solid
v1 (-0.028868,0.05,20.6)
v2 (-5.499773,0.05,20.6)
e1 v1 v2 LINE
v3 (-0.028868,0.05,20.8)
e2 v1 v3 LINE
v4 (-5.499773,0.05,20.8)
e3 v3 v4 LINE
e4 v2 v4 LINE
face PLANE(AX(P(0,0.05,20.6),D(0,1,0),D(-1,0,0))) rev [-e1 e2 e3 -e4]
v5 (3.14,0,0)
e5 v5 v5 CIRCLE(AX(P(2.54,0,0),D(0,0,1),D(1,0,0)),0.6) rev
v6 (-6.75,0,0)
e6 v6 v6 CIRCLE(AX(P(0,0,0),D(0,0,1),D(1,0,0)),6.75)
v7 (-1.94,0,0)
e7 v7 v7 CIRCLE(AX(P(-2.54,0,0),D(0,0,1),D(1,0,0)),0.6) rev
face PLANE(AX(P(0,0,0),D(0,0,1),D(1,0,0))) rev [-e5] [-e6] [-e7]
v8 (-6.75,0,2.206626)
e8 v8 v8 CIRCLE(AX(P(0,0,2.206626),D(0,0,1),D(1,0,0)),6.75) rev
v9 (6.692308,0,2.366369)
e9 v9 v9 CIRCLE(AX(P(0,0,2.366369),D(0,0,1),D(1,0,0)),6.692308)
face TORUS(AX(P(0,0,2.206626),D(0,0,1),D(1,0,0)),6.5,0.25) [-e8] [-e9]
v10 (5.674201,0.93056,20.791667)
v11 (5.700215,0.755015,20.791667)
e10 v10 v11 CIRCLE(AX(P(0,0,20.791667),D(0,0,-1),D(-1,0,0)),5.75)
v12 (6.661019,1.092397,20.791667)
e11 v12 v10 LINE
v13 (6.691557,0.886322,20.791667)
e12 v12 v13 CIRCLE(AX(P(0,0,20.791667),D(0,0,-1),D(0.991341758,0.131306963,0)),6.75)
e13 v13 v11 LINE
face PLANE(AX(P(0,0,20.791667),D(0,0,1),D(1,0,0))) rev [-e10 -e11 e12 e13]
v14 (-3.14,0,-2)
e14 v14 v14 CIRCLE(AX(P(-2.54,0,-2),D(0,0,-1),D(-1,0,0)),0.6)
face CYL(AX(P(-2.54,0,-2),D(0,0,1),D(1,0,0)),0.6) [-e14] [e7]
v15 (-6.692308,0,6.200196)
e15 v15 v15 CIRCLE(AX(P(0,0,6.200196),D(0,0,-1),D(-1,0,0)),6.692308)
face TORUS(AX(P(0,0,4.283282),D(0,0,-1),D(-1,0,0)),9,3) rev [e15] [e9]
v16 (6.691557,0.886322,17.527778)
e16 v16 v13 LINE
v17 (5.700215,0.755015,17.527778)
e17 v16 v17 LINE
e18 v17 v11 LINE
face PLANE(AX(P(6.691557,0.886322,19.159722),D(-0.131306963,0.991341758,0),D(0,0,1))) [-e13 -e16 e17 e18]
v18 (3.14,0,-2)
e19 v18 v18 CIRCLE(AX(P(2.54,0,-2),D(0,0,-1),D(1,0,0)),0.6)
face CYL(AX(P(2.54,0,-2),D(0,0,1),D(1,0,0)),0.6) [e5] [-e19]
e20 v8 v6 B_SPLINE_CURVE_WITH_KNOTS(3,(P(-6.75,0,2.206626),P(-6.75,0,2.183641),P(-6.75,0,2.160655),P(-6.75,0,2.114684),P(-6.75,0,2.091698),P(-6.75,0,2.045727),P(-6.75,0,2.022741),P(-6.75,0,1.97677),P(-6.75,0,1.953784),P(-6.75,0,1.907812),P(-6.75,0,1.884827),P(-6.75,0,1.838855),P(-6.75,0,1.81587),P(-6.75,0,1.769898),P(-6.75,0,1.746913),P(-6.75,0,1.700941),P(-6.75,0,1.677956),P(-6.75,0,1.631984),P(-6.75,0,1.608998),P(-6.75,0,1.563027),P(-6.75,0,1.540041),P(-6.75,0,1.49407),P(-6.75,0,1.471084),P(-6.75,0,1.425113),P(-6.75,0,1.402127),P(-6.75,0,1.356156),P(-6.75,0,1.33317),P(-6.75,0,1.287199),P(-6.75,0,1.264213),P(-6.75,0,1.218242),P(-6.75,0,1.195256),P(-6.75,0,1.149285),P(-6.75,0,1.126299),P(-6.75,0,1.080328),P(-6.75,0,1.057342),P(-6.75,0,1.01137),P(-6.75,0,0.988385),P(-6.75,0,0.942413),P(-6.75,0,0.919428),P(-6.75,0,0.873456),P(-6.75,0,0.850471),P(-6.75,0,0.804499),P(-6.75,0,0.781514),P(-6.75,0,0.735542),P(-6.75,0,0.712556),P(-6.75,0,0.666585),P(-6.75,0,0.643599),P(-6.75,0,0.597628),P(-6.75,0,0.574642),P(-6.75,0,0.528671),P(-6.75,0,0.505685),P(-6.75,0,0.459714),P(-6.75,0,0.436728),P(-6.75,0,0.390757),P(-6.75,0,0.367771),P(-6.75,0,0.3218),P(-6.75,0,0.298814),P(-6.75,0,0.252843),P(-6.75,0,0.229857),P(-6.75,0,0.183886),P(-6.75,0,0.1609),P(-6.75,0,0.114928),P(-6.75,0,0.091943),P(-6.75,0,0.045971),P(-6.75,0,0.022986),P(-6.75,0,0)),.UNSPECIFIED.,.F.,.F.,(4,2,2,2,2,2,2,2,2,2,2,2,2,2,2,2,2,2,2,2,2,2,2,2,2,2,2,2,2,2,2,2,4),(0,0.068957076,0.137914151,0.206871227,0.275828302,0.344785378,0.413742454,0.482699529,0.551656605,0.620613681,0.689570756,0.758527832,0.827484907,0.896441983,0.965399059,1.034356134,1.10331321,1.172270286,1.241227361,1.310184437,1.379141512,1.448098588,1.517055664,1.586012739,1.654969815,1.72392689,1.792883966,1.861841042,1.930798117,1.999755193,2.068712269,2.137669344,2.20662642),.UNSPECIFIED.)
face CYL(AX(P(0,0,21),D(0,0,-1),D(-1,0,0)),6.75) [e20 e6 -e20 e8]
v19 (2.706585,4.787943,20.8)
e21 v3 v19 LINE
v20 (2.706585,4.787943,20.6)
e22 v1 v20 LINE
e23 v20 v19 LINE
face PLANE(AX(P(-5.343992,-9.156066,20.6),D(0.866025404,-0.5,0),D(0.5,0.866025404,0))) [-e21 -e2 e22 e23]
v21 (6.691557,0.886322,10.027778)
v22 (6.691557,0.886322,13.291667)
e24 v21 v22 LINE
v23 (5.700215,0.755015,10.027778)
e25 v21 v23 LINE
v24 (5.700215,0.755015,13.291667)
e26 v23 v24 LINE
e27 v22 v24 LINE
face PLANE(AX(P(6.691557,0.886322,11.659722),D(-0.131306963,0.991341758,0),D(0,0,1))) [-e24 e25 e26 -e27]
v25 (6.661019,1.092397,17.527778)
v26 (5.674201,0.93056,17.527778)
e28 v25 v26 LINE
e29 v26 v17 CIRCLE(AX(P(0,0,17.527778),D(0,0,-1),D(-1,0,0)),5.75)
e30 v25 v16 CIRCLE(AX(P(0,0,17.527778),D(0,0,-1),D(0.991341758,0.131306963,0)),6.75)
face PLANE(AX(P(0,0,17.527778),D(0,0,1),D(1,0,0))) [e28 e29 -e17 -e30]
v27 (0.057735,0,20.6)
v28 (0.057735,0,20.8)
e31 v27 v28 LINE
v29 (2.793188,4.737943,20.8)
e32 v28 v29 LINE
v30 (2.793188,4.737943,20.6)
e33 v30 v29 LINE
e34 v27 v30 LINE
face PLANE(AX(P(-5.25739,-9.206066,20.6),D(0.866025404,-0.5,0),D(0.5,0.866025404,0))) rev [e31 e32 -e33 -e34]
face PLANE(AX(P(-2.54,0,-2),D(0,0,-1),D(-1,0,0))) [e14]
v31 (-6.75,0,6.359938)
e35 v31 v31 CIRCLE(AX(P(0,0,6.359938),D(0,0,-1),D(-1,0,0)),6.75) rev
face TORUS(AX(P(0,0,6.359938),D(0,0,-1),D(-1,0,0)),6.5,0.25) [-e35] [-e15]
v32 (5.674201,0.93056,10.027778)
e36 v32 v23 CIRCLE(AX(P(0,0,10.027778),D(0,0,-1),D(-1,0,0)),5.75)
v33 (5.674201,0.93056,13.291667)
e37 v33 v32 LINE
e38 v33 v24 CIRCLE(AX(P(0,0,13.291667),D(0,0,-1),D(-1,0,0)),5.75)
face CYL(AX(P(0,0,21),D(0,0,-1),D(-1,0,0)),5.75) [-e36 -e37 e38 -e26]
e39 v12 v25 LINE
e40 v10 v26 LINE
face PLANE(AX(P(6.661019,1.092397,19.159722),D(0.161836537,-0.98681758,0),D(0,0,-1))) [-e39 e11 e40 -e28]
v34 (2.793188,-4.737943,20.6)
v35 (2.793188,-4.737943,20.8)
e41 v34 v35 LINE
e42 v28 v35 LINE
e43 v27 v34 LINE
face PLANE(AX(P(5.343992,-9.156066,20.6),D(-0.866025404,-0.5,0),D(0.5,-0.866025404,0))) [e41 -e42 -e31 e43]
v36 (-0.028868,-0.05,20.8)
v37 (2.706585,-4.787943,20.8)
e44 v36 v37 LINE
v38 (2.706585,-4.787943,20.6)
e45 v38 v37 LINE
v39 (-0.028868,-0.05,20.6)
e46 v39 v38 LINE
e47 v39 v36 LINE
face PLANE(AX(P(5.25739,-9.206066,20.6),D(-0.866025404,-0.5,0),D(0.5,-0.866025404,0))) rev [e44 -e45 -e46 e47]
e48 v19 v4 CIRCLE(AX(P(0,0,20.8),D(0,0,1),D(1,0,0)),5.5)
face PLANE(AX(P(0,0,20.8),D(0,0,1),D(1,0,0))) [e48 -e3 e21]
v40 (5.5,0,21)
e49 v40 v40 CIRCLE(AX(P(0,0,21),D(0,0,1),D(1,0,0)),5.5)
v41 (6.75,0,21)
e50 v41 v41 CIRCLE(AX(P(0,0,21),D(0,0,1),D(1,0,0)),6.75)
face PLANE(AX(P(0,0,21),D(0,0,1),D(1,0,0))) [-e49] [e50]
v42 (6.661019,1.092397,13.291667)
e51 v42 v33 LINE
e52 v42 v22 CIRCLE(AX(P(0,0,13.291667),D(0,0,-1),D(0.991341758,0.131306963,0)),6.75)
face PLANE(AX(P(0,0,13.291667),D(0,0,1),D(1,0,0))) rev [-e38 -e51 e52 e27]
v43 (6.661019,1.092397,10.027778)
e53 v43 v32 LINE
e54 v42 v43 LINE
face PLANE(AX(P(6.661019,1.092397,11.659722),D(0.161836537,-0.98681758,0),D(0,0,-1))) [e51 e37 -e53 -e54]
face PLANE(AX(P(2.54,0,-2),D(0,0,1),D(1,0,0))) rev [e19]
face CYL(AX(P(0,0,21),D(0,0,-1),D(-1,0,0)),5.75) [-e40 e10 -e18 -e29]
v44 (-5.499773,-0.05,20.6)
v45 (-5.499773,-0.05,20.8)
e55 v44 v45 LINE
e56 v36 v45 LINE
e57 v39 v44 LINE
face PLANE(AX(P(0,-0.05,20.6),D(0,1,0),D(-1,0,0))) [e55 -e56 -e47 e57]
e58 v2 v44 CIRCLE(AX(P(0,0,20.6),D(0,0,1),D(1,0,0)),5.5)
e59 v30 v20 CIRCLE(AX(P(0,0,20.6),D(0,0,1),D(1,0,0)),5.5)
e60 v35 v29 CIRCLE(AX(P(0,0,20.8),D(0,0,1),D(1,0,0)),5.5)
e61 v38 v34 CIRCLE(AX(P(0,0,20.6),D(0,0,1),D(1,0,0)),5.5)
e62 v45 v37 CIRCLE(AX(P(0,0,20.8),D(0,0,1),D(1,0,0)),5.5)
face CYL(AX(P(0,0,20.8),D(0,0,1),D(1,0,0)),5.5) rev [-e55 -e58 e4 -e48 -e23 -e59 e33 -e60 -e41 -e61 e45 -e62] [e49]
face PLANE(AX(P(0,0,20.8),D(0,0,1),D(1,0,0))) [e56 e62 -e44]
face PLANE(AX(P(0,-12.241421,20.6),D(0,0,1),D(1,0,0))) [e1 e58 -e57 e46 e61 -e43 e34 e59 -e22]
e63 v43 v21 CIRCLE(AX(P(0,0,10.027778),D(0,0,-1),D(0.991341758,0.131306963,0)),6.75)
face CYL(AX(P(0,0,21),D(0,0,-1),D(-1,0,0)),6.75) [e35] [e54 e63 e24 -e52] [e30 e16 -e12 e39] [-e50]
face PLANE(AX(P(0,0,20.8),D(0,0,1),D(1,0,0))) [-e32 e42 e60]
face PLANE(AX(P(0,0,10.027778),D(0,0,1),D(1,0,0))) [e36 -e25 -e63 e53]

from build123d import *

# Parameters (mm, degrees)
SKETCH_1_R          = 6.75
EXTRUDE_1_DEPTH     = 21
SKETCH_2_R          = 5.5
CUT_EXTRUDE_1_DEPTH = 0.2
CUT_EXTRUDE_2_DEPTH = 0.2
FILLET_1_R          = 0.25
SKETCH_5_R          = 0.6
EXTRUDE_2_DEPTH     = 2
WRAP_START          = 10.027777778
WRAP_2_DEPTH        = 3.263888889
WRAP_START_2        = 17.527777778
WRAP_2_2_DEPTH      = 3.263888889


# Read off the part's stored shape, not the designer's step: 包覆2
with BuildPart() as part:
    # 草图1 → 凸台-拉伸1 (new body)
    with BuildSketch(Plane.XY):
        with Locations(Location((0, 0, 0), (0, 0, 180))):
            Circle(SKETCH_1_R)
    extrude(amount=EXTRUDE_1_DEPTH)

    # 草图2 → 切除-拉伸1 (cut)
    with BuildSketch(Plane.XY.offset(21)):
        Circle(SKETCH_2_R)
    extrude(amount=-CUT_EXTRUDE_1_DEPTH, mode=Mode.SUBTRACT)

    # 草图3 → 切除-拉伸2 (cut)
    with BuildSketch(Plane.XY.offset(20.8)):
        with BuildLine():
            Line((-0.04330127, 0.025), (-0.028867513, 0.05))
            Line((-0.028867513, 0.05), (-5.499772723, 0.05))
            ThreePointArc((-5.499772723, 0.05), (-5.5, 0), (-5.499772723, -0.05))
            Line((-5.499772723, -0.05), (-0.028867513, -0.05))
            Line((-0.028867513, -0.05), (-0.04330127, -0.025))
            Line((-0.04330127, -0.025), (0, 0))
            Line((0, 0), (-0.04330127, 0.025))
        make_face()
        with BuildLine():
            Line((0.04330127, -0.025), (0, 0))
            Line((0, 0), (0, -0.05))
            Line((0, -0.05), (-0.028867513, -0.05))
            Line((-0.028867513, -0.05), (2.706585091, -4.787942893))
            ThreePointArc((2.706585091, -4.787942893), (2.75, -4.763139721), (2.793187631, -4.737942893))
            Line((2.793187631, -4.737942893), (0.057735027, 0))
            Line((0.057735027, 0), (0.04330127, -0.025))
        make_face()
        with BuildLine():
            Line((-0.028867513, 0.05), (0, 0.05))
            Line((0, 0.05), (0, 0))
            Line((0, 0), (0.04330127, 0.025))
            Line((0.04330127, 0.025), (0.057735027, 0))
            Line((0.057735027, 0), (2.793187631, 4.737942893))
            ThreePointArc((2.793187631, 4.737942893), (2.75, 4.763139721), (2.706585091, 4.787942893))
            Line((2.706585091, 4.787942893), (-0.028867513, 0.05))
        make_face()
        Polygon((0, 0), (0, 0.05), (-0.028867513, 0.05), (-0.04330127, 0.025), align=None)
        Polygon((0, -0.05), (0, 0), (-0.04330127, -0.025), (-0.028867513, -0.05), align=None)
        Polygon((0.04330127, 0.025), (0, 0), (0.04330127, -0.025), (0.057735027, 0), align=None)
    extrude(amount=-CUT_EXTRUDE_2_DEPTH, mode=Mode.SUBTRACT)

    # 草图4 → 切除-旋转1 (revolve, cut)
    with BuildSketch(Plane(origin=(0, 0, 0), x_dir=(1, 0, 0), z_dir=(0, 1, 0))):
        with BuildLine():
            Line((-6.818421305, -2.223982894), (-6.818421305, -6.342581877))
            ThreePointArc((-6.818421305, -6.342581877), (-6, -4.283282386), (-6.818421305, -2.223982894))
        make_face()
    revolve(axis=Axis((0, 0, 0), (0, 0, 1)), mode=Mode.SUBTRACT)

    # 圆角1
    fillet_1_edges = [part.edges().sort_by_distance(p)[0] for p in [
        (6.75, 0, 6.267595869),
        (6.75, 0, 2.298968902),
    ]]
    fillet(fillet_1_edges, radius=FILLET_1_R)

    # 草图5 → 凸台-拉伸2 (add)
    with BuildSketch(Plane(origin=(0, 0, 0), x_dir=(-1, 0, 0), z_dir=(0, 0, -1))):
        with Locations(Location((2.54, 0, 0), (0, 0, 180))):
            Circle(SKETCH_5_R)
        with Locations(Location((-2.54, 0, 0), (0, 0, 180))):
            Circle(SKETCH_5_R)
    extrude(amount=EXTRUDE_2_DEPTH)

    # 包覆2 outline → 包覆2 (cut)
    with BuildSketch(Plane.XY.offset(WRAP_START)):
        with BuildLine():
            Line((6.661018662, 1.092396624), (5.674201083, 0.930560087))
            ThreePointArc((5.674201083, 0.930560087), (5.687885367, 0.842887927), (5.700215109, 0.755015037))
            Line((5.700215109, 0.755015037), (6.691556868, 0.886322))
            ThreePointArc((6.691556868, 0.886322), (6.677082822, 0.989477131), (6.661018662, 1.092396624))
        make_face()
    extrude(amount=WRAP_2_DEPTH, mode=Mode.SUBTRACT)

    # Wrap 2 2 outline → Wrap 2 2 (cut)
    with BuildSketch(Plane.XY.offset(WRAP_START_2)):
        with BuildLine():
            Line((6.661018662, 1.092396624), (5.674201083, 0.930560087))
            ThreePointArc((5.674201083, 0.930560087), (5.687885367, 0.842887927), (5.700215109, 0.755015037))
            Line((5.700215109, 0.755015037), (6.691556868, 0.886322))
            ThreePointArc((6.691556868, 0.886322), (6.677082822, 0.989477131), (6.661018662, 1.092396624))
        make_face()
    extrude(amount=WRAP_2_2_DEPTH, mode=Mode.SUBTRACT)


solid = part.part
